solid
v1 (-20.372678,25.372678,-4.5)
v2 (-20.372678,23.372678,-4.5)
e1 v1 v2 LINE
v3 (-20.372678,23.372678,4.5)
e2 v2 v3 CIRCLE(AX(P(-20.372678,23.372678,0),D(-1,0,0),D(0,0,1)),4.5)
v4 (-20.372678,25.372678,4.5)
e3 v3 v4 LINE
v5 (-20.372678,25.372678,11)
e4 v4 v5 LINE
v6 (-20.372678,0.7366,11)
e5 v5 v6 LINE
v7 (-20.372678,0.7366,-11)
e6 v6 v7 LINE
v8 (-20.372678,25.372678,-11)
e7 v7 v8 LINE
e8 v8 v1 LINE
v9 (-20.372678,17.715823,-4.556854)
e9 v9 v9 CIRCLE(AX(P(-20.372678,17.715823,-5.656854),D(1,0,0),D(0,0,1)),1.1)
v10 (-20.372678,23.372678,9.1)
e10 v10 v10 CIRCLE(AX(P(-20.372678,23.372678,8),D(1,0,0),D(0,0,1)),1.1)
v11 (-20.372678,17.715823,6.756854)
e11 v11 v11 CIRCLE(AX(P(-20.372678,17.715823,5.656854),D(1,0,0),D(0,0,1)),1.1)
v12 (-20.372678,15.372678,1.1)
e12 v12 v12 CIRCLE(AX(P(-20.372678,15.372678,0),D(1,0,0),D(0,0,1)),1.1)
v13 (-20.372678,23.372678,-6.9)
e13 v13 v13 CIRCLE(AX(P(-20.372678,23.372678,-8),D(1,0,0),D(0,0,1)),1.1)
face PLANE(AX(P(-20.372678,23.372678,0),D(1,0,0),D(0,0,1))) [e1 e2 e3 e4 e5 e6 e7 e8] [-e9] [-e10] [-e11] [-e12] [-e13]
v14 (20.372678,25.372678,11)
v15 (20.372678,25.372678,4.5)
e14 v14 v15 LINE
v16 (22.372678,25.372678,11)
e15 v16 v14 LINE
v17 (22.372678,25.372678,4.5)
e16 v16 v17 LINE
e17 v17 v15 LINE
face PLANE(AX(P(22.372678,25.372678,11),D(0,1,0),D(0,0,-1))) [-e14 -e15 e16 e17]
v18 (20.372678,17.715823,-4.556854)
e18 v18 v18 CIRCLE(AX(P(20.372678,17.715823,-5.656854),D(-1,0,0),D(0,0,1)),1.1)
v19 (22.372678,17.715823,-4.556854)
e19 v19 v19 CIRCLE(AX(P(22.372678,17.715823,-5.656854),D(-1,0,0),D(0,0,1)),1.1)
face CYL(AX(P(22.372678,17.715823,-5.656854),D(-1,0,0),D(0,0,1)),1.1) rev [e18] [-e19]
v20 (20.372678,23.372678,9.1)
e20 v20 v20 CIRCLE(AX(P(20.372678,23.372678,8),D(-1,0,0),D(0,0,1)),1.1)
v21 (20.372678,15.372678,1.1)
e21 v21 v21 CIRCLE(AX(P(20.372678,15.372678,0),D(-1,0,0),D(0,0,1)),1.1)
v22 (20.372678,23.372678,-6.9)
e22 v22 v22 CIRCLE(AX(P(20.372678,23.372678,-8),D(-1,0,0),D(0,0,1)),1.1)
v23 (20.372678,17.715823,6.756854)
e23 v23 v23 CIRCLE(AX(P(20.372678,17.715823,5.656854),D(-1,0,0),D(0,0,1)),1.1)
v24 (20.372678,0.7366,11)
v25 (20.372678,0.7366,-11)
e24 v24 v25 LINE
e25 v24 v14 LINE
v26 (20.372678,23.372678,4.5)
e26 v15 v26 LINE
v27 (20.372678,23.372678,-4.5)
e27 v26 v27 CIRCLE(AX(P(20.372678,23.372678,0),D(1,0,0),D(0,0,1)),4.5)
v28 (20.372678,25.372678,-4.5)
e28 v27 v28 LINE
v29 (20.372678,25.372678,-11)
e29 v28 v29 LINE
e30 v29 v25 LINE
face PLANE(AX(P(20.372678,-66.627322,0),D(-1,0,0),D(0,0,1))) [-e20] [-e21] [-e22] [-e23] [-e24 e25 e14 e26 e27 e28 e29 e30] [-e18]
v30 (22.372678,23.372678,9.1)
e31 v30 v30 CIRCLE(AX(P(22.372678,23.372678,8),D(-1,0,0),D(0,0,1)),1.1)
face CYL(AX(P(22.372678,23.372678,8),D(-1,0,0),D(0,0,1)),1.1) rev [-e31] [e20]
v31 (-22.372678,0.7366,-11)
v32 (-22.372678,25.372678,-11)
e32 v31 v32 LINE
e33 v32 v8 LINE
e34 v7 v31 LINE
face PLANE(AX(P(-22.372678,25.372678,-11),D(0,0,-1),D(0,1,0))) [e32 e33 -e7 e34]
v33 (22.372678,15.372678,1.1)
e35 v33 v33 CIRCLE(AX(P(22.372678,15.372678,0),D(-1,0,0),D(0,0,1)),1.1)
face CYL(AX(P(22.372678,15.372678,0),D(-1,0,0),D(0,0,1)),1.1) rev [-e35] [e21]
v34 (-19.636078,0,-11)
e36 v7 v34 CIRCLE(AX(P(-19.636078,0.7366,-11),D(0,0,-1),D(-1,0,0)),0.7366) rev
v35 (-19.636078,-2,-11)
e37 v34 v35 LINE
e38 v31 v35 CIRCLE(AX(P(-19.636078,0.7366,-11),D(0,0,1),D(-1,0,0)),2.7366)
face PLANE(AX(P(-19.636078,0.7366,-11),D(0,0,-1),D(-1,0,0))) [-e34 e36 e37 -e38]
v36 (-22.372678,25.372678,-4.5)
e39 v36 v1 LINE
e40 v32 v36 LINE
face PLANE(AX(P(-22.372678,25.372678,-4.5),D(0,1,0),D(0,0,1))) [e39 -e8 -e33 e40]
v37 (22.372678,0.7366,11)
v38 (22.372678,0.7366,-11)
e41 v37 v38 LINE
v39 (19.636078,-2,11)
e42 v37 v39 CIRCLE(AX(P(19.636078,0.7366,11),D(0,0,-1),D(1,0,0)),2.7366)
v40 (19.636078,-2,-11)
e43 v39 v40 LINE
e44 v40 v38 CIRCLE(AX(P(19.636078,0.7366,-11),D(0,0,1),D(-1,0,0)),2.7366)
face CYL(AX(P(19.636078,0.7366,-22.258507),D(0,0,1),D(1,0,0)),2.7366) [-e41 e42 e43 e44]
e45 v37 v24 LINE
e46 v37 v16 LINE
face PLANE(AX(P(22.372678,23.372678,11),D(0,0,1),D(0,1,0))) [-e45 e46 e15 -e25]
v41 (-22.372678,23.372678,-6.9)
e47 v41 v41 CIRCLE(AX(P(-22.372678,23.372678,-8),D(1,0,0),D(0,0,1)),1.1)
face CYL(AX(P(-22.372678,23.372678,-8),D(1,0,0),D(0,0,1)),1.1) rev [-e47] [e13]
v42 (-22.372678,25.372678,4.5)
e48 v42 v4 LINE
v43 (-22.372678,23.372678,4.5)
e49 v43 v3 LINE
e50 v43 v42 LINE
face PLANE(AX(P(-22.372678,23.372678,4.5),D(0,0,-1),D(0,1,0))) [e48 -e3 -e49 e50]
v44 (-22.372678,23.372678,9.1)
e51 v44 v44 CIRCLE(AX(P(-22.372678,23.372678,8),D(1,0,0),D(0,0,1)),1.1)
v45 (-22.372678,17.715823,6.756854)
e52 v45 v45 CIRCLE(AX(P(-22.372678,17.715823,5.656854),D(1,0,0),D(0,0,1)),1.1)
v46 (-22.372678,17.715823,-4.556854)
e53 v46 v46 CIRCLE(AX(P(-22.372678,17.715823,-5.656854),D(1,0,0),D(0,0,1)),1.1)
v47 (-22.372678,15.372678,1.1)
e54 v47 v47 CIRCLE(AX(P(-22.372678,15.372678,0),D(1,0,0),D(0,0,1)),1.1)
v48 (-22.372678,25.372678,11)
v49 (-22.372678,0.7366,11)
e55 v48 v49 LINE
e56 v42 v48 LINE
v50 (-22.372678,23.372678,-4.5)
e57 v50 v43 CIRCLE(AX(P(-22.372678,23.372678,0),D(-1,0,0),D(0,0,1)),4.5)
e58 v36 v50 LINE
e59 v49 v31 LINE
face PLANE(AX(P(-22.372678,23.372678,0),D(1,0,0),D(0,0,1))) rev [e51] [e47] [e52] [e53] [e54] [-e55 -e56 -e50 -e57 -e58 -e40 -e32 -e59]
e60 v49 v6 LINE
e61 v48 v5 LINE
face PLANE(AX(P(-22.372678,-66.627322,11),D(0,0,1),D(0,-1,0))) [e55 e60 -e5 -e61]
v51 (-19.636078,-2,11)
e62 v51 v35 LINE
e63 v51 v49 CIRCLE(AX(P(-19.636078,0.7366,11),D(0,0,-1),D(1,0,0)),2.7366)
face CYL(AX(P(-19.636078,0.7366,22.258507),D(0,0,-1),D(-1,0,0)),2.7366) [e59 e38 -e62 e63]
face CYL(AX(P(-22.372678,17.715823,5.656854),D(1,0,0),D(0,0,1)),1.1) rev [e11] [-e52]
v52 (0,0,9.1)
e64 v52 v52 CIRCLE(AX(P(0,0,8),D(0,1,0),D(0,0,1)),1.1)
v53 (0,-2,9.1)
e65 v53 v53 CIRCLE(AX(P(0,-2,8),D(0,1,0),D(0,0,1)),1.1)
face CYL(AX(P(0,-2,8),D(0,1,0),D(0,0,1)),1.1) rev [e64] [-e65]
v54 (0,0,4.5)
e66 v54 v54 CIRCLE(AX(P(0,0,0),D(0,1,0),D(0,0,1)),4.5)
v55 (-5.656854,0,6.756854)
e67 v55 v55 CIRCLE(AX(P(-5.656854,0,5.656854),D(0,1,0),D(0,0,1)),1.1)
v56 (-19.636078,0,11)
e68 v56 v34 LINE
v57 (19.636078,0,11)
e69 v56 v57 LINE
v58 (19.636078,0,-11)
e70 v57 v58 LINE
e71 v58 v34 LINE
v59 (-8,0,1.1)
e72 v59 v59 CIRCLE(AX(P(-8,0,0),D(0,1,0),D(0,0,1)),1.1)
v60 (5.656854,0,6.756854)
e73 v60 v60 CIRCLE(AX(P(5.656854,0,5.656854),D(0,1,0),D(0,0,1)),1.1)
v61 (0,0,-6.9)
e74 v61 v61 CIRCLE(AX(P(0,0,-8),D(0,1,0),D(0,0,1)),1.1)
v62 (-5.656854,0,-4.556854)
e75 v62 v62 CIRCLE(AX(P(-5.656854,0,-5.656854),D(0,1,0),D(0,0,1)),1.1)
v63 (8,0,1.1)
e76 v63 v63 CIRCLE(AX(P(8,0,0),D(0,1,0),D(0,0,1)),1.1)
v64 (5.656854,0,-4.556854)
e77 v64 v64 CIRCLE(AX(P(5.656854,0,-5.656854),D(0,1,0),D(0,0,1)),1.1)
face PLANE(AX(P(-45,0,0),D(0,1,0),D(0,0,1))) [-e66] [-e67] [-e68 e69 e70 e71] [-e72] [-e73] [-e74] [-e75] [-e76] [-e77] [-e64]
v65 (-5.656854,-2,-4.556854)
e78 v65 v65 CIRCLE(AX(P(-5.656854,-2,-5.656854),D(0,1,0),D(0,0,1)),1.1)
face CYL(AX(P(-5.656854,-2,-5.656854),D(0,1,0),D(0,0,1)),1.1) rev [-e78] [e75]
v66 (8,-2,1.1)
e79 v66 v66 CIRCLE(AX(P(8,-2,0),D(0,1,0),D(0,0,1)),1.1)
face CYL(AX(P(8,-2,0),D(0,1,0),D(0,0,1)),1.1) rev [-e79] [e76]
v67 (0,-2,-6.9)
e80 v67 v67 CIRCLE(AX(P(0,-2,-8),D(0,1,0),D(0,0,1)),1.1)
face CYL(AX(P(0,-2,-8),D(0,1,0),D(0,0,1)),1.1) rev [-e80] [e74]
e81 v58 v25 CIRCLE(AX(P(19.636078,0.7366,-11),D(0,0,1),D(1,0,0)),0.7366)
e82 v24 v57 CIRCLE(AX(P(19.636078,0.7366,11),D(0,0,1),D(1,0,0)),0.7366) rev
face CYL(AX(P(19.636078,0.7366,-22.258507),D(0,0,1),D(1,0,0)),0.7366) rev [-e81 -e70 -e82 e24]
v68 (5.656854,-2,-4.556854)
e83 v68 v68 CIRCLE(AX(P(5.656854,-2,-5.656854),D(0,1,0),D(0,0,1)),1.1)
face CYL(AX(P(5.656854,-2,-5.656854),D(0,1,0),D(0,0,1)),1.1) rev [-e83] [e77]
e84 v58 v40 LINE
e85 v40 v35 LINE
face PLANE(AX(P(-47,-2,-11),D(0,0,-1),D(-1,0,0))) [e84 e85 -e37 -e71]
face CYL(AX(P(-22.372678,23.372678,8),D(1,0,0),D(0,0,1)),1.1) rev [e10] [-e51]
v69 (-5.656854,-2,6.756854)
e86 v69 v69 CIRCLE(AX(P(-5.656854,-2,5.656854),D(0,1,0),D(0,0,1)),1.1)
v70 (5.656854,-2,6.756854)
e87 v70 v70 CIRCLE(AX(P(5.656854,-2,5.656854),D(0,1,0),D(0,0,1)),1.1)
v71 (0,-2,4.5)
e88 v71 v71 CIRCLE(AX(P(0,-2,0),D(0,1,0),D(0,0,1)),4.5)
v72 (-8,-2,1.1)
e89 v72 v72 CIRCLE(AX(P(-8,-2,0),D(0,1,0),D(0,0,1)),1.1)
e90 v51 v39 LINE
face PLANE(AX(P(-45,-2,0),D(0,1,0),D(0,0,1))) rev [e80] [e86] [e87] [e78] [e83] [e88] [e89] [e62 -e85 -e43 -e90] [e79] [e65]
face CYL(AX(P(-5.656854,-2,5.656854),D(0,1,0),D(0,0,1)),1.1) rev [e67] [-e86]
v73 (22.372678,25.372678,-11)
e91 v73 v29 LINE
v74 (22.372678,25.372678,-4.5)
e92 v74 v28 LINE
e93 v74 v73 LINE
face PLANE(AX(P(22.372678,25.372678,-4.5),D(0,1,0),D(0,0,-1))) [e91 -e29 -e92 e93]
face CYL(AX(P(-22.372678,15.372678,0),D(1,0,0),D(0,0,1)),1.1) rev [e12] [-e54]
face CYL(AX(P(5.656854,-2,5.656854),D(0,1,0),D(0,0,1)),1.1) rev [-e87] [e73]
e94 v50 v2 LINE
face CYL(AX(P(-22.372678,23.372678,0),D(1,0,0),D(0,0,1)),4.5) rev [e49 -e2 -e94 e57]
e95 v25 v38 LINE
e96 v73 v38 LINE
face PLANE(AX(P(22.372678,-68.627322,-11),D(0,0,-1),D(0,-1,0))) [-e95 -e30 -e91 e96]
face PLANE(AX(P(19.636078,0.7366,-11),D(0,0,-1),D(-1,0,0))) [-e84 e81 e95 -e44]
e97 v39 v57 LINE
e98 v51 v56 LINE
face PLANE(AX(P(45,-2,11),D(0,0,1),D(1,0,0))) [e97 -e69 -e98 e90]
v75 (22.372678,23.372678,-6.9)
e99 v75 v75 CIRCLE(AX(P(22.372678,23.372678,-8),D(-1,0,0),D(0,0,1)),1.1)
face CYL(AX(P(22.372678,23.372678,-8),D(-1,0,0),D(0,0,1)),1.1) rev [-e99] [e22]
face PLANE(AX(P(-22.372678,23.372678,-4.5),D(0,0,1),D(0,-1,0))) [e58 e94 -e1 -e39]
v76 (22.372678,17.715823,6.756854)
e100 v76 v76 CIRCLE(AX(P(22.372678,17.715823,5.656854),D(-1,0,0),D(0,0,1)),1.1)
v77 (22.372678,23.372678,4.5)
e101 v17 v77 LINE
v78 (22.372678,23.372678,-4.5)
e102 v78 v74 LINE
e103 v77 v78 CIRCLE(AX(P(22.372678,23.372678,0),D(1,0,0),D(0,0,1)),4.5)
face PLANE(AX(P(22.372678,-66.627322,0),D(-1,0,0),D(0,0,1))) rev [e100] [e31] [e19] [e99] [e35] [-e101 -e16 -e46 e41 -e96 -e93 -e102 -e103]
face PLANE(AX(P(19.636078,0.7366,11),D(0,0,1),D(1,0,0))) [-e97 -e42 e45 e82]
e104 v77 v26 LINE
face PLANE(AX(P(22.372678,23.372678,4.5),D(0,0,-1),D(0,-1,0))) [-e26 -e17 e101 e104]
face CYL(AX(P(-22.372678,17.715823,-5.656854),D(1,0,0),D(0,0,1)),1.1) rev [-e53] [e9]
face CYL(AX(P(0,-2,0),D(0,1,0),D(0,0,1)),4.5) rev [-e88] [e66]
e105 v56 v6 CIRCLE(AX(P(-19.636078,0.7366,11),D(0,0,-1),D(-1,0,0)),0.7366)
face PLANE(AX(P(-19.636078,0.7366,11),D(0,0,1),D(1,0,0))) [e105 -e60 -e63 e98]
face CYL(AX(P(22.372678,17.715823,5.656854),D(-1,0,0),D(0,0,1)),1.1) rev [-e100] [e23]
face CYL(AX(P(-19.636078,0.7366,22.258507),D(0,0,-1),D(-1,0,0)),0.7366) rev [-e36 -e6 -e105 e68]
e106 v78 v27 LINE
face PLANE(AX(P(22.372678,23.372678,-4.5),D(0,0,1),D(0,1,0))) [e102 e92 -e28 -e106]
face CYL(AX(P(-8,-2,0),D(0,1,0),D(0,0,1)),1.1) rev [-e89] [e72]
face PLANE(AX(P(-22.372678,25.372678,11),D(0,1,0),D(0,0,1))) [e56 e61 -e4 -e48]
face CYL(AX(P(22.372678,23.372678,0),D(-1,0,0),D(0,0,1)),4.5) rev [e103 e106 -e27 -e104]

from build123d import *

# Parameters (mm, degrees)
SKETCH_1_R             = 4.5
SKETCH_1_R_2           = 1.1
SM_BASE_FLANGE_1_DEPTH = 2
OTHER_START            = -47
OTHER_1_OUTLINE_W      = 2
OTHER_1_OUTLINE_H      = 22
OTHER_1_DEPTH          = 24.627322451
OTHER_START_2          = 22.372677549
OTHER_1_2_OUTLINE_W    = 2
OTHER_1_2_OUTLINE_H    = 22
OTHER_1_2_DEPTH        = 24.627322451
OTHER_START_3          = -22.106515833
OTHER_1_3_OUTLINE_R    = 1.1
OTHER_1_3_DEPTH        = 1.733838284
OTHER_START_4          = 20.372677549
OTHER_1_4_OUTLINE_R    = 1.1
OTHER_1_4_DEPTH        = 1.733838284
OTHER_START_5          = -22.372677549
OTHER_1_5_OUTLINE_R    = 1.1
OTHER_1_5_DEPTH        = 2.7366
OTHER_START_6          = 19.636077549
OTHER_1_6_OUTLINE_R    = 1.1
OTHER_1_6_DEPTH        = 2.7366
OTHER_START_7          = -12
OTHER_1_7_DEPTH        = 24


with BuildPart() as part:
    # 基体-法兰1: sheet metal written as solids
    # Sketch 1 → 基体-法兰1 (new body)
    with BuildSketch(Plane(origin=(0, 0, 0), x_dir=(1, 0, 0), z_dir=(0, 1, 0))):
        with BuildLine():
            Line((-45, -11), (-47, -11))
            Line((-47, -11), (-47, -4.5))
            Line((-47, -4.5), (-45, -4.5))
            ThreePointArc((-45, -4.5), (-40.5, 0), (-45, 4.5))
            Line((-45, 4.5), (-47, 4.5))
            Line((-47, 4.5), (-47, 11))
            Line((-47, 11), (-45, 11))
            Line((-45, 11), (45, 11))
            Line((45, 11), (47, 11))
            Line((47, 11), (47, 4.5))
            Line((47, 4.5), (45, 4.5))
            ThreePointArc((45, 4.5), (40.5, 0), (45, -4.5))
            Line((45, -4.5), (47, -4.5))
            Line((47, -4.5), (47, -11))
            Line((47, -11), (45, -11))
            Line((45, -11), (-45, -11))
        make_face()
        with Locations(Location((0, 0, 0), (0, 0, 270))):
            Circle(SKETCH_1_R, mode=Mode.SUBTRACT)
        with Locations(Location((0, 8, 0), (0, 0, 270))):
            Circle(SKETCH_1_R_2, mode=Mode.SUBTRACT)
        with Locations(Location((5.656854249, 5.656854249, 0), (0, 0, 270))):
            Circle(SKETCH_1_R_2, mode=Mode.SUBTRACT)
        with Locations(Location((8, 0, 0), (0, 0, 270))):
            Circle(SKETCH_1_R_2, mode=Mode.SUBTRACT)
        with Locations(Location((5.656854249, -5.656854249, 0), (0, 0, 270))):
            Circle(SKETCH_1_R_2, mode=Mode.SUBTRACT)
        with Locations(Location((0, -8, 0), (0, 0, 270))):
            Circle(SKETCH_1_R_2, mode=Mode.SUBTRACT)
        with Locations(Location((-5.656854249, -5.656854249, 0), (0, 0, 270))):
            Circle(SKETCH_1_R_2, mode=Mode.SUBTRACT)
        with Locations(Location((-8, 0, 0), (0, 0, 270))):
            Circle(SKETCH_1_R_2, mode=Mode.SUBTRACT)
        with Locations(Location((-5.656854249, 5.656854249, 0), (0, 0, 270))):
            Circle(SKETCH_1_R_2, mode=Mode.SUBTRACT)
        with Locations(Location((-45, 8, 0), (0, 0, 270))):
            Circle(SKETCH_1_R_2, mode=Mode.SUBTRACT)
        with Locations(Location((-39.343145751, 5.656854249, 0), (0, 0, 270))):
            Circle(SKETCH_1_R_2, mode=Mode.SUBTRACT)
        with Locations(Location((-37, 0, 0), (0, 0, 270))):
            Circle(SKETCH_1_R_2, mode=Mode.SUBTRACT)
        with Locations(Location((-39.343145751, -5.656854249, 0), (0, 0, 270))):
            Circle(SKETCH_1_R_2, mode=Mode.SUBTRACT)
        with Locations(Location((-45, -8, 0), (0, 0, 270))):
            Circle(SKETCH_1_R_2, mode=Mode.SUBTRACT)
        with Locations(Location((45, 8, 0), (0, 0, 270))):
            Circle(SKETCH_1_R_2, mode=Mode.SUBTRACT)
        with Locations(Location((45, -8, 0), (0, 0, 270))):
            Circle(SKETCH_1_R_2, mode=Mode.SUBTRACT)
        with Locations(Location((39.343145751, -5.656854249, 0), (0, 0, 270))):
            Circle(SKETCH_1_R_2, mode=Mode.SUBTRACT)
        with Locations(Location((37, 0, 0), (0, 0, 270))):
            Circle(SKETCH_1_R_2, mode=Mode.SUBTRACT)
        with Locations(Location((39.343145751, 5.656854249, 0), (0, 0, 270))):
            Circle(SKETCH_1_R_2, mode=Mode.SUBTRACT)
    extrude(amount=-SM_BASE_FLANGE_1_DEPTH)

    # Other 1: read off the stored shape, not the designer's step
    # Other 1 outline → Other 1 (cut)
    with BuildSketch(Plane.YZ.offset(OTHER_START)):
        with Locations((-1, 0)):
            Rectangle(OTHER_1_OUTLINE_W, OTHER_1_OUTLINE_H)
    extrude(amount=OTHER_1_DEPTH, mode=Mode.SUBTRACT)

    # Other 1 2 outline → Other 1 2 (cut)
    with BuildSketch(Plane.YZ.offset(OTHER_START_2)):
        with Locations((-1, 0)):
            Rectangle(OTHER_1_2_OUTLINE_W, OTHER_1_2_OUTLINE_H)
    extrude(amount=OTHER_1_2_DEPTH, mode=Mode.SUBTRACT)

    # Other 1 3 outline → Other 1 3 (add)
    with BuildSketch(Plane.YZ.offset(OTHER_START_3)):
        with BuildLine():
            Line((0, 11), (0, -11))
            Line((0, -11), (25.372677549, -11))
            Line((25.372677549, -11), (25.372677549, -4.5))
            Line((25.372677549, -4.5), (23.372677549, -4.5))
            ThreePointArc((23.372677549, -4.5), (18.872677549, 0), (23.372677549, 4.5))
            Line((23.372677549, 4.5), (25.372677549, 4.5))
            Line((25.372677549, 4.5), (25.372677549, 11))
            Line((25.372677549, 11), (0, 11))
        make_face()
        with Locations((17.7158233, -5.656854249)):
            Circle(OTHER_1_3_OUTLINE_R, mode=Mode.SUBTRACT)
        with Locations((23.372677549, -8)):
            Circle(OTHER_1_3_OUTLINE_R, mode=Mode.SUBTRACT)
        with Locations((15.372677549, 0)):
            Circle(OTHER_1_3_OUTLINE_R, mode=Mode.SUBTRACT)
        with Locations((17.7158233, 5.656854249)):
            Circle(OTHER_1_3_OUTLINE_R, mode=Mode.SUBTRACT)
        with Locations((23.372677549, 8)):
            Circle(OTHER_1_3_OUTLINE_R, mode=Mode.SUBTRACT)
    extrude(amount=OTHER_1_3_DEPTH)

    # Other 1 4 outline → Other 1 4 (add)
    with BuildSketch(Plane.YZ.offset(OTHER_START_4)):
        with BuildLine():
            Line((0, 11), (0, -11))
            Line((0, -11), (25.372677549, -11))
            Line((25.372677549, -11), (25.372677549, -4.5))
            Line((25.372677549, -4.5), (23.372677549, -4.5))
            ThreePointArc((23.372677549, -4.5), (18.872677549, 0), (23.372677549, 4.5))
            Line((23.372677549, 4.5), (25.372677549, 4.5))
            Line((25.372677549, 4.5), (25.372677549, 11))
            Line((25.372677549, 11), (0, 11))
        make_face()
        with Locations((17.7158233, -5.656854249)):
            Circle(OTHER_1_4_OUTLINE_R, mode=Mode.SUBTRACT)
        with Locations((23.372677549, -8)):
            Circle(OTHER_1_4_OUTLINE_R, mode=Mode.SUBTRACT)
        with Locations((15.372677549, 0)):
            Circle(OTHER_1_4_OUTLINE_R, mode=Mode.SUBTRACT)
        with Locations((17.7158233, 5.656854249)):
            Circle(OTHER_1_4_OUTLINE_R, mode=Mode.SUBTRACT)
        with Locations((23.372677549, 8)):
            Circle(OTHER_1_4_OUTLINE_R, mode=Mode.SUBTRACT)
    extrude(amount=OTHER_1_4_DEPTH)

    # Other 1 5 outline → Other 1 5 (add)
    with BuildSketch(Plane.YZ.offset(OTHER_START_5)):
        with BuildLine():
            Line((0, -11), (25.372677549, -11))
            Line((25.372677549, -11), (25.372677549, -4.5))
            Line((25.372677549, -4.5), (23.372677549, -4.5))
            ThreePointArc((23.372677549, -4.5), (18.872677549, 0), (23.372677549, 4.5))
            Line((23.372677549, 4.5), (25.372677549, 4.5))
            Line((25.372677549, 4.5), (25.372677549, 11))
            Line((25.372677549, 11), (0, 11))
            Line((0, 11), (0, -11))
        make_face()
        with Locations((17.7158233, -5.656854249)):
            Circle(OTHER_1_5_OUTLINE_R, mode=Mode.SUBTRACT)
        with Locations((23.372677549, -8)):
            Circle(OTHER_1_5_OUTLINE_R, mode=Mode.SUBTRACT)
        with Locations((15.372677549, 0)):
            Circle(OTHER_1_5_OUTLINE_R, mode=Mode.SUBTRACT)
        with Locations((17.7158233, 5.656854249)):
            Circle(OTHER_1_5_OUTLINE_R, mode=Mode.SUBTRACT)
        with Locations((23.372677549, 8)):
            Circle(OTHER_1_5_OUTLINE_R, mode=Mode.SUBTRACT)
    extrude(amount=OTHER_1_5_DEPTH)

    # Other 1 6 outline → Other 1 6 (add)
    with BuildSketch(Plane.YZ.offset(OTHER_START_6)):
        with BuildLine():
            Line((0, -11), (25.372677549, -11))
            Line((25.372677549, -11), (25.372677549, -4.5))
            Line((25.372677549, -4.5), (23.372677549, -4.5))
            ThreePointArc((23.372677549, -4.5), (18.872677549, 0), (23.372677549, 4.5))
            Line((23.372677549, 4.5), (25.372677549, 4.5))
            Line((25.372677549, 4.5), (25.372677549, 11))
            Line((25.372677549, 11), (0, 11))
            Line((0, 11), (0, -11))
        make_face()
        with Locations((17.7158233, -5.656854249)):
            Circle(OTHER_1_6_OUTLINE_R, mode=Mode.SUBTRACT)
        with Locations((23.372677549, -8)):
            Circle(OTHER_1_6_OUTLINE_R, mode=Mode.SUBTRACT)
        with Locations((15.372677549, 0)):
            Circle(OTHER_1_6_OUTLINE_R, mode=Mode.SUBTRACT)
        with Locations((17.7158233, 5.656854249)):
            Circle(OTHER_1_6_OUTLINE_R, mode=Mode.SUBTRACT)
        with Locations((23.372677549, 8)):
            Circle(OTHER_1_6_OUTLINE_R, mode=Mode.SUBTRACT)
    extrude(amount=OTHER_1_6_DEPTH)

    # Other 1 7 outline → Other 1 7 (cut)
    with BuildSketch(Plane.XY.offset(OTHER_START_7)):
        with BuildLine():
            Line((-22.372677549, -2), (-19.636077549, -2))
            ThreePointArc((-19.636077549, -2), (-21.571145966, -1.198468418), (-22.372677549, 0.7366))
            Line((-22.372677549, 0.7366), (-22.372677549, -2))
        make_face()
        with BuildLine():
            Line((20.372677549, 0.7366), (20.372677549, 25.372677549))
            Line((20.372677549, 25.372677549), (19.636077549, 25.372677549))
            Line((19.636077549, 25.372677549), (19.636077549, 0))
            ThreePointArc((19.636077549, 0), (20.156932404, 0.215745145), (20.372677549, 0.7366))
        make_face()
        with BuildLine():
            ThreePointArc((22.372677549, 0.7366), (21.571145966, -1.198468418), (19.636077549, -2))
            Line((19.636077549, -2), (22.372677549, -2))
            Line((22.372677549, -2), (22.372677549, 0.7366))
        make_face()
        with BuildLine():
            Line((-19.636077549, 25.372677549), (-20.372677549, 25.372677549))
            Line((-20.372677549, 25.372677549), (-20.372677549, 0.7366))
            ThreePointArc((-20.372677549, 0.7366), (-20.156932404, 0.215745145), (-19.636077549, 0))
            Line((-19.636077549, 0), (-19.636077549, 25.372677549))
        make_face()
    extrude(amount=OTHER_1_7_DEPTH, mode=Mode.SUBTRACT)


solid = part.part
